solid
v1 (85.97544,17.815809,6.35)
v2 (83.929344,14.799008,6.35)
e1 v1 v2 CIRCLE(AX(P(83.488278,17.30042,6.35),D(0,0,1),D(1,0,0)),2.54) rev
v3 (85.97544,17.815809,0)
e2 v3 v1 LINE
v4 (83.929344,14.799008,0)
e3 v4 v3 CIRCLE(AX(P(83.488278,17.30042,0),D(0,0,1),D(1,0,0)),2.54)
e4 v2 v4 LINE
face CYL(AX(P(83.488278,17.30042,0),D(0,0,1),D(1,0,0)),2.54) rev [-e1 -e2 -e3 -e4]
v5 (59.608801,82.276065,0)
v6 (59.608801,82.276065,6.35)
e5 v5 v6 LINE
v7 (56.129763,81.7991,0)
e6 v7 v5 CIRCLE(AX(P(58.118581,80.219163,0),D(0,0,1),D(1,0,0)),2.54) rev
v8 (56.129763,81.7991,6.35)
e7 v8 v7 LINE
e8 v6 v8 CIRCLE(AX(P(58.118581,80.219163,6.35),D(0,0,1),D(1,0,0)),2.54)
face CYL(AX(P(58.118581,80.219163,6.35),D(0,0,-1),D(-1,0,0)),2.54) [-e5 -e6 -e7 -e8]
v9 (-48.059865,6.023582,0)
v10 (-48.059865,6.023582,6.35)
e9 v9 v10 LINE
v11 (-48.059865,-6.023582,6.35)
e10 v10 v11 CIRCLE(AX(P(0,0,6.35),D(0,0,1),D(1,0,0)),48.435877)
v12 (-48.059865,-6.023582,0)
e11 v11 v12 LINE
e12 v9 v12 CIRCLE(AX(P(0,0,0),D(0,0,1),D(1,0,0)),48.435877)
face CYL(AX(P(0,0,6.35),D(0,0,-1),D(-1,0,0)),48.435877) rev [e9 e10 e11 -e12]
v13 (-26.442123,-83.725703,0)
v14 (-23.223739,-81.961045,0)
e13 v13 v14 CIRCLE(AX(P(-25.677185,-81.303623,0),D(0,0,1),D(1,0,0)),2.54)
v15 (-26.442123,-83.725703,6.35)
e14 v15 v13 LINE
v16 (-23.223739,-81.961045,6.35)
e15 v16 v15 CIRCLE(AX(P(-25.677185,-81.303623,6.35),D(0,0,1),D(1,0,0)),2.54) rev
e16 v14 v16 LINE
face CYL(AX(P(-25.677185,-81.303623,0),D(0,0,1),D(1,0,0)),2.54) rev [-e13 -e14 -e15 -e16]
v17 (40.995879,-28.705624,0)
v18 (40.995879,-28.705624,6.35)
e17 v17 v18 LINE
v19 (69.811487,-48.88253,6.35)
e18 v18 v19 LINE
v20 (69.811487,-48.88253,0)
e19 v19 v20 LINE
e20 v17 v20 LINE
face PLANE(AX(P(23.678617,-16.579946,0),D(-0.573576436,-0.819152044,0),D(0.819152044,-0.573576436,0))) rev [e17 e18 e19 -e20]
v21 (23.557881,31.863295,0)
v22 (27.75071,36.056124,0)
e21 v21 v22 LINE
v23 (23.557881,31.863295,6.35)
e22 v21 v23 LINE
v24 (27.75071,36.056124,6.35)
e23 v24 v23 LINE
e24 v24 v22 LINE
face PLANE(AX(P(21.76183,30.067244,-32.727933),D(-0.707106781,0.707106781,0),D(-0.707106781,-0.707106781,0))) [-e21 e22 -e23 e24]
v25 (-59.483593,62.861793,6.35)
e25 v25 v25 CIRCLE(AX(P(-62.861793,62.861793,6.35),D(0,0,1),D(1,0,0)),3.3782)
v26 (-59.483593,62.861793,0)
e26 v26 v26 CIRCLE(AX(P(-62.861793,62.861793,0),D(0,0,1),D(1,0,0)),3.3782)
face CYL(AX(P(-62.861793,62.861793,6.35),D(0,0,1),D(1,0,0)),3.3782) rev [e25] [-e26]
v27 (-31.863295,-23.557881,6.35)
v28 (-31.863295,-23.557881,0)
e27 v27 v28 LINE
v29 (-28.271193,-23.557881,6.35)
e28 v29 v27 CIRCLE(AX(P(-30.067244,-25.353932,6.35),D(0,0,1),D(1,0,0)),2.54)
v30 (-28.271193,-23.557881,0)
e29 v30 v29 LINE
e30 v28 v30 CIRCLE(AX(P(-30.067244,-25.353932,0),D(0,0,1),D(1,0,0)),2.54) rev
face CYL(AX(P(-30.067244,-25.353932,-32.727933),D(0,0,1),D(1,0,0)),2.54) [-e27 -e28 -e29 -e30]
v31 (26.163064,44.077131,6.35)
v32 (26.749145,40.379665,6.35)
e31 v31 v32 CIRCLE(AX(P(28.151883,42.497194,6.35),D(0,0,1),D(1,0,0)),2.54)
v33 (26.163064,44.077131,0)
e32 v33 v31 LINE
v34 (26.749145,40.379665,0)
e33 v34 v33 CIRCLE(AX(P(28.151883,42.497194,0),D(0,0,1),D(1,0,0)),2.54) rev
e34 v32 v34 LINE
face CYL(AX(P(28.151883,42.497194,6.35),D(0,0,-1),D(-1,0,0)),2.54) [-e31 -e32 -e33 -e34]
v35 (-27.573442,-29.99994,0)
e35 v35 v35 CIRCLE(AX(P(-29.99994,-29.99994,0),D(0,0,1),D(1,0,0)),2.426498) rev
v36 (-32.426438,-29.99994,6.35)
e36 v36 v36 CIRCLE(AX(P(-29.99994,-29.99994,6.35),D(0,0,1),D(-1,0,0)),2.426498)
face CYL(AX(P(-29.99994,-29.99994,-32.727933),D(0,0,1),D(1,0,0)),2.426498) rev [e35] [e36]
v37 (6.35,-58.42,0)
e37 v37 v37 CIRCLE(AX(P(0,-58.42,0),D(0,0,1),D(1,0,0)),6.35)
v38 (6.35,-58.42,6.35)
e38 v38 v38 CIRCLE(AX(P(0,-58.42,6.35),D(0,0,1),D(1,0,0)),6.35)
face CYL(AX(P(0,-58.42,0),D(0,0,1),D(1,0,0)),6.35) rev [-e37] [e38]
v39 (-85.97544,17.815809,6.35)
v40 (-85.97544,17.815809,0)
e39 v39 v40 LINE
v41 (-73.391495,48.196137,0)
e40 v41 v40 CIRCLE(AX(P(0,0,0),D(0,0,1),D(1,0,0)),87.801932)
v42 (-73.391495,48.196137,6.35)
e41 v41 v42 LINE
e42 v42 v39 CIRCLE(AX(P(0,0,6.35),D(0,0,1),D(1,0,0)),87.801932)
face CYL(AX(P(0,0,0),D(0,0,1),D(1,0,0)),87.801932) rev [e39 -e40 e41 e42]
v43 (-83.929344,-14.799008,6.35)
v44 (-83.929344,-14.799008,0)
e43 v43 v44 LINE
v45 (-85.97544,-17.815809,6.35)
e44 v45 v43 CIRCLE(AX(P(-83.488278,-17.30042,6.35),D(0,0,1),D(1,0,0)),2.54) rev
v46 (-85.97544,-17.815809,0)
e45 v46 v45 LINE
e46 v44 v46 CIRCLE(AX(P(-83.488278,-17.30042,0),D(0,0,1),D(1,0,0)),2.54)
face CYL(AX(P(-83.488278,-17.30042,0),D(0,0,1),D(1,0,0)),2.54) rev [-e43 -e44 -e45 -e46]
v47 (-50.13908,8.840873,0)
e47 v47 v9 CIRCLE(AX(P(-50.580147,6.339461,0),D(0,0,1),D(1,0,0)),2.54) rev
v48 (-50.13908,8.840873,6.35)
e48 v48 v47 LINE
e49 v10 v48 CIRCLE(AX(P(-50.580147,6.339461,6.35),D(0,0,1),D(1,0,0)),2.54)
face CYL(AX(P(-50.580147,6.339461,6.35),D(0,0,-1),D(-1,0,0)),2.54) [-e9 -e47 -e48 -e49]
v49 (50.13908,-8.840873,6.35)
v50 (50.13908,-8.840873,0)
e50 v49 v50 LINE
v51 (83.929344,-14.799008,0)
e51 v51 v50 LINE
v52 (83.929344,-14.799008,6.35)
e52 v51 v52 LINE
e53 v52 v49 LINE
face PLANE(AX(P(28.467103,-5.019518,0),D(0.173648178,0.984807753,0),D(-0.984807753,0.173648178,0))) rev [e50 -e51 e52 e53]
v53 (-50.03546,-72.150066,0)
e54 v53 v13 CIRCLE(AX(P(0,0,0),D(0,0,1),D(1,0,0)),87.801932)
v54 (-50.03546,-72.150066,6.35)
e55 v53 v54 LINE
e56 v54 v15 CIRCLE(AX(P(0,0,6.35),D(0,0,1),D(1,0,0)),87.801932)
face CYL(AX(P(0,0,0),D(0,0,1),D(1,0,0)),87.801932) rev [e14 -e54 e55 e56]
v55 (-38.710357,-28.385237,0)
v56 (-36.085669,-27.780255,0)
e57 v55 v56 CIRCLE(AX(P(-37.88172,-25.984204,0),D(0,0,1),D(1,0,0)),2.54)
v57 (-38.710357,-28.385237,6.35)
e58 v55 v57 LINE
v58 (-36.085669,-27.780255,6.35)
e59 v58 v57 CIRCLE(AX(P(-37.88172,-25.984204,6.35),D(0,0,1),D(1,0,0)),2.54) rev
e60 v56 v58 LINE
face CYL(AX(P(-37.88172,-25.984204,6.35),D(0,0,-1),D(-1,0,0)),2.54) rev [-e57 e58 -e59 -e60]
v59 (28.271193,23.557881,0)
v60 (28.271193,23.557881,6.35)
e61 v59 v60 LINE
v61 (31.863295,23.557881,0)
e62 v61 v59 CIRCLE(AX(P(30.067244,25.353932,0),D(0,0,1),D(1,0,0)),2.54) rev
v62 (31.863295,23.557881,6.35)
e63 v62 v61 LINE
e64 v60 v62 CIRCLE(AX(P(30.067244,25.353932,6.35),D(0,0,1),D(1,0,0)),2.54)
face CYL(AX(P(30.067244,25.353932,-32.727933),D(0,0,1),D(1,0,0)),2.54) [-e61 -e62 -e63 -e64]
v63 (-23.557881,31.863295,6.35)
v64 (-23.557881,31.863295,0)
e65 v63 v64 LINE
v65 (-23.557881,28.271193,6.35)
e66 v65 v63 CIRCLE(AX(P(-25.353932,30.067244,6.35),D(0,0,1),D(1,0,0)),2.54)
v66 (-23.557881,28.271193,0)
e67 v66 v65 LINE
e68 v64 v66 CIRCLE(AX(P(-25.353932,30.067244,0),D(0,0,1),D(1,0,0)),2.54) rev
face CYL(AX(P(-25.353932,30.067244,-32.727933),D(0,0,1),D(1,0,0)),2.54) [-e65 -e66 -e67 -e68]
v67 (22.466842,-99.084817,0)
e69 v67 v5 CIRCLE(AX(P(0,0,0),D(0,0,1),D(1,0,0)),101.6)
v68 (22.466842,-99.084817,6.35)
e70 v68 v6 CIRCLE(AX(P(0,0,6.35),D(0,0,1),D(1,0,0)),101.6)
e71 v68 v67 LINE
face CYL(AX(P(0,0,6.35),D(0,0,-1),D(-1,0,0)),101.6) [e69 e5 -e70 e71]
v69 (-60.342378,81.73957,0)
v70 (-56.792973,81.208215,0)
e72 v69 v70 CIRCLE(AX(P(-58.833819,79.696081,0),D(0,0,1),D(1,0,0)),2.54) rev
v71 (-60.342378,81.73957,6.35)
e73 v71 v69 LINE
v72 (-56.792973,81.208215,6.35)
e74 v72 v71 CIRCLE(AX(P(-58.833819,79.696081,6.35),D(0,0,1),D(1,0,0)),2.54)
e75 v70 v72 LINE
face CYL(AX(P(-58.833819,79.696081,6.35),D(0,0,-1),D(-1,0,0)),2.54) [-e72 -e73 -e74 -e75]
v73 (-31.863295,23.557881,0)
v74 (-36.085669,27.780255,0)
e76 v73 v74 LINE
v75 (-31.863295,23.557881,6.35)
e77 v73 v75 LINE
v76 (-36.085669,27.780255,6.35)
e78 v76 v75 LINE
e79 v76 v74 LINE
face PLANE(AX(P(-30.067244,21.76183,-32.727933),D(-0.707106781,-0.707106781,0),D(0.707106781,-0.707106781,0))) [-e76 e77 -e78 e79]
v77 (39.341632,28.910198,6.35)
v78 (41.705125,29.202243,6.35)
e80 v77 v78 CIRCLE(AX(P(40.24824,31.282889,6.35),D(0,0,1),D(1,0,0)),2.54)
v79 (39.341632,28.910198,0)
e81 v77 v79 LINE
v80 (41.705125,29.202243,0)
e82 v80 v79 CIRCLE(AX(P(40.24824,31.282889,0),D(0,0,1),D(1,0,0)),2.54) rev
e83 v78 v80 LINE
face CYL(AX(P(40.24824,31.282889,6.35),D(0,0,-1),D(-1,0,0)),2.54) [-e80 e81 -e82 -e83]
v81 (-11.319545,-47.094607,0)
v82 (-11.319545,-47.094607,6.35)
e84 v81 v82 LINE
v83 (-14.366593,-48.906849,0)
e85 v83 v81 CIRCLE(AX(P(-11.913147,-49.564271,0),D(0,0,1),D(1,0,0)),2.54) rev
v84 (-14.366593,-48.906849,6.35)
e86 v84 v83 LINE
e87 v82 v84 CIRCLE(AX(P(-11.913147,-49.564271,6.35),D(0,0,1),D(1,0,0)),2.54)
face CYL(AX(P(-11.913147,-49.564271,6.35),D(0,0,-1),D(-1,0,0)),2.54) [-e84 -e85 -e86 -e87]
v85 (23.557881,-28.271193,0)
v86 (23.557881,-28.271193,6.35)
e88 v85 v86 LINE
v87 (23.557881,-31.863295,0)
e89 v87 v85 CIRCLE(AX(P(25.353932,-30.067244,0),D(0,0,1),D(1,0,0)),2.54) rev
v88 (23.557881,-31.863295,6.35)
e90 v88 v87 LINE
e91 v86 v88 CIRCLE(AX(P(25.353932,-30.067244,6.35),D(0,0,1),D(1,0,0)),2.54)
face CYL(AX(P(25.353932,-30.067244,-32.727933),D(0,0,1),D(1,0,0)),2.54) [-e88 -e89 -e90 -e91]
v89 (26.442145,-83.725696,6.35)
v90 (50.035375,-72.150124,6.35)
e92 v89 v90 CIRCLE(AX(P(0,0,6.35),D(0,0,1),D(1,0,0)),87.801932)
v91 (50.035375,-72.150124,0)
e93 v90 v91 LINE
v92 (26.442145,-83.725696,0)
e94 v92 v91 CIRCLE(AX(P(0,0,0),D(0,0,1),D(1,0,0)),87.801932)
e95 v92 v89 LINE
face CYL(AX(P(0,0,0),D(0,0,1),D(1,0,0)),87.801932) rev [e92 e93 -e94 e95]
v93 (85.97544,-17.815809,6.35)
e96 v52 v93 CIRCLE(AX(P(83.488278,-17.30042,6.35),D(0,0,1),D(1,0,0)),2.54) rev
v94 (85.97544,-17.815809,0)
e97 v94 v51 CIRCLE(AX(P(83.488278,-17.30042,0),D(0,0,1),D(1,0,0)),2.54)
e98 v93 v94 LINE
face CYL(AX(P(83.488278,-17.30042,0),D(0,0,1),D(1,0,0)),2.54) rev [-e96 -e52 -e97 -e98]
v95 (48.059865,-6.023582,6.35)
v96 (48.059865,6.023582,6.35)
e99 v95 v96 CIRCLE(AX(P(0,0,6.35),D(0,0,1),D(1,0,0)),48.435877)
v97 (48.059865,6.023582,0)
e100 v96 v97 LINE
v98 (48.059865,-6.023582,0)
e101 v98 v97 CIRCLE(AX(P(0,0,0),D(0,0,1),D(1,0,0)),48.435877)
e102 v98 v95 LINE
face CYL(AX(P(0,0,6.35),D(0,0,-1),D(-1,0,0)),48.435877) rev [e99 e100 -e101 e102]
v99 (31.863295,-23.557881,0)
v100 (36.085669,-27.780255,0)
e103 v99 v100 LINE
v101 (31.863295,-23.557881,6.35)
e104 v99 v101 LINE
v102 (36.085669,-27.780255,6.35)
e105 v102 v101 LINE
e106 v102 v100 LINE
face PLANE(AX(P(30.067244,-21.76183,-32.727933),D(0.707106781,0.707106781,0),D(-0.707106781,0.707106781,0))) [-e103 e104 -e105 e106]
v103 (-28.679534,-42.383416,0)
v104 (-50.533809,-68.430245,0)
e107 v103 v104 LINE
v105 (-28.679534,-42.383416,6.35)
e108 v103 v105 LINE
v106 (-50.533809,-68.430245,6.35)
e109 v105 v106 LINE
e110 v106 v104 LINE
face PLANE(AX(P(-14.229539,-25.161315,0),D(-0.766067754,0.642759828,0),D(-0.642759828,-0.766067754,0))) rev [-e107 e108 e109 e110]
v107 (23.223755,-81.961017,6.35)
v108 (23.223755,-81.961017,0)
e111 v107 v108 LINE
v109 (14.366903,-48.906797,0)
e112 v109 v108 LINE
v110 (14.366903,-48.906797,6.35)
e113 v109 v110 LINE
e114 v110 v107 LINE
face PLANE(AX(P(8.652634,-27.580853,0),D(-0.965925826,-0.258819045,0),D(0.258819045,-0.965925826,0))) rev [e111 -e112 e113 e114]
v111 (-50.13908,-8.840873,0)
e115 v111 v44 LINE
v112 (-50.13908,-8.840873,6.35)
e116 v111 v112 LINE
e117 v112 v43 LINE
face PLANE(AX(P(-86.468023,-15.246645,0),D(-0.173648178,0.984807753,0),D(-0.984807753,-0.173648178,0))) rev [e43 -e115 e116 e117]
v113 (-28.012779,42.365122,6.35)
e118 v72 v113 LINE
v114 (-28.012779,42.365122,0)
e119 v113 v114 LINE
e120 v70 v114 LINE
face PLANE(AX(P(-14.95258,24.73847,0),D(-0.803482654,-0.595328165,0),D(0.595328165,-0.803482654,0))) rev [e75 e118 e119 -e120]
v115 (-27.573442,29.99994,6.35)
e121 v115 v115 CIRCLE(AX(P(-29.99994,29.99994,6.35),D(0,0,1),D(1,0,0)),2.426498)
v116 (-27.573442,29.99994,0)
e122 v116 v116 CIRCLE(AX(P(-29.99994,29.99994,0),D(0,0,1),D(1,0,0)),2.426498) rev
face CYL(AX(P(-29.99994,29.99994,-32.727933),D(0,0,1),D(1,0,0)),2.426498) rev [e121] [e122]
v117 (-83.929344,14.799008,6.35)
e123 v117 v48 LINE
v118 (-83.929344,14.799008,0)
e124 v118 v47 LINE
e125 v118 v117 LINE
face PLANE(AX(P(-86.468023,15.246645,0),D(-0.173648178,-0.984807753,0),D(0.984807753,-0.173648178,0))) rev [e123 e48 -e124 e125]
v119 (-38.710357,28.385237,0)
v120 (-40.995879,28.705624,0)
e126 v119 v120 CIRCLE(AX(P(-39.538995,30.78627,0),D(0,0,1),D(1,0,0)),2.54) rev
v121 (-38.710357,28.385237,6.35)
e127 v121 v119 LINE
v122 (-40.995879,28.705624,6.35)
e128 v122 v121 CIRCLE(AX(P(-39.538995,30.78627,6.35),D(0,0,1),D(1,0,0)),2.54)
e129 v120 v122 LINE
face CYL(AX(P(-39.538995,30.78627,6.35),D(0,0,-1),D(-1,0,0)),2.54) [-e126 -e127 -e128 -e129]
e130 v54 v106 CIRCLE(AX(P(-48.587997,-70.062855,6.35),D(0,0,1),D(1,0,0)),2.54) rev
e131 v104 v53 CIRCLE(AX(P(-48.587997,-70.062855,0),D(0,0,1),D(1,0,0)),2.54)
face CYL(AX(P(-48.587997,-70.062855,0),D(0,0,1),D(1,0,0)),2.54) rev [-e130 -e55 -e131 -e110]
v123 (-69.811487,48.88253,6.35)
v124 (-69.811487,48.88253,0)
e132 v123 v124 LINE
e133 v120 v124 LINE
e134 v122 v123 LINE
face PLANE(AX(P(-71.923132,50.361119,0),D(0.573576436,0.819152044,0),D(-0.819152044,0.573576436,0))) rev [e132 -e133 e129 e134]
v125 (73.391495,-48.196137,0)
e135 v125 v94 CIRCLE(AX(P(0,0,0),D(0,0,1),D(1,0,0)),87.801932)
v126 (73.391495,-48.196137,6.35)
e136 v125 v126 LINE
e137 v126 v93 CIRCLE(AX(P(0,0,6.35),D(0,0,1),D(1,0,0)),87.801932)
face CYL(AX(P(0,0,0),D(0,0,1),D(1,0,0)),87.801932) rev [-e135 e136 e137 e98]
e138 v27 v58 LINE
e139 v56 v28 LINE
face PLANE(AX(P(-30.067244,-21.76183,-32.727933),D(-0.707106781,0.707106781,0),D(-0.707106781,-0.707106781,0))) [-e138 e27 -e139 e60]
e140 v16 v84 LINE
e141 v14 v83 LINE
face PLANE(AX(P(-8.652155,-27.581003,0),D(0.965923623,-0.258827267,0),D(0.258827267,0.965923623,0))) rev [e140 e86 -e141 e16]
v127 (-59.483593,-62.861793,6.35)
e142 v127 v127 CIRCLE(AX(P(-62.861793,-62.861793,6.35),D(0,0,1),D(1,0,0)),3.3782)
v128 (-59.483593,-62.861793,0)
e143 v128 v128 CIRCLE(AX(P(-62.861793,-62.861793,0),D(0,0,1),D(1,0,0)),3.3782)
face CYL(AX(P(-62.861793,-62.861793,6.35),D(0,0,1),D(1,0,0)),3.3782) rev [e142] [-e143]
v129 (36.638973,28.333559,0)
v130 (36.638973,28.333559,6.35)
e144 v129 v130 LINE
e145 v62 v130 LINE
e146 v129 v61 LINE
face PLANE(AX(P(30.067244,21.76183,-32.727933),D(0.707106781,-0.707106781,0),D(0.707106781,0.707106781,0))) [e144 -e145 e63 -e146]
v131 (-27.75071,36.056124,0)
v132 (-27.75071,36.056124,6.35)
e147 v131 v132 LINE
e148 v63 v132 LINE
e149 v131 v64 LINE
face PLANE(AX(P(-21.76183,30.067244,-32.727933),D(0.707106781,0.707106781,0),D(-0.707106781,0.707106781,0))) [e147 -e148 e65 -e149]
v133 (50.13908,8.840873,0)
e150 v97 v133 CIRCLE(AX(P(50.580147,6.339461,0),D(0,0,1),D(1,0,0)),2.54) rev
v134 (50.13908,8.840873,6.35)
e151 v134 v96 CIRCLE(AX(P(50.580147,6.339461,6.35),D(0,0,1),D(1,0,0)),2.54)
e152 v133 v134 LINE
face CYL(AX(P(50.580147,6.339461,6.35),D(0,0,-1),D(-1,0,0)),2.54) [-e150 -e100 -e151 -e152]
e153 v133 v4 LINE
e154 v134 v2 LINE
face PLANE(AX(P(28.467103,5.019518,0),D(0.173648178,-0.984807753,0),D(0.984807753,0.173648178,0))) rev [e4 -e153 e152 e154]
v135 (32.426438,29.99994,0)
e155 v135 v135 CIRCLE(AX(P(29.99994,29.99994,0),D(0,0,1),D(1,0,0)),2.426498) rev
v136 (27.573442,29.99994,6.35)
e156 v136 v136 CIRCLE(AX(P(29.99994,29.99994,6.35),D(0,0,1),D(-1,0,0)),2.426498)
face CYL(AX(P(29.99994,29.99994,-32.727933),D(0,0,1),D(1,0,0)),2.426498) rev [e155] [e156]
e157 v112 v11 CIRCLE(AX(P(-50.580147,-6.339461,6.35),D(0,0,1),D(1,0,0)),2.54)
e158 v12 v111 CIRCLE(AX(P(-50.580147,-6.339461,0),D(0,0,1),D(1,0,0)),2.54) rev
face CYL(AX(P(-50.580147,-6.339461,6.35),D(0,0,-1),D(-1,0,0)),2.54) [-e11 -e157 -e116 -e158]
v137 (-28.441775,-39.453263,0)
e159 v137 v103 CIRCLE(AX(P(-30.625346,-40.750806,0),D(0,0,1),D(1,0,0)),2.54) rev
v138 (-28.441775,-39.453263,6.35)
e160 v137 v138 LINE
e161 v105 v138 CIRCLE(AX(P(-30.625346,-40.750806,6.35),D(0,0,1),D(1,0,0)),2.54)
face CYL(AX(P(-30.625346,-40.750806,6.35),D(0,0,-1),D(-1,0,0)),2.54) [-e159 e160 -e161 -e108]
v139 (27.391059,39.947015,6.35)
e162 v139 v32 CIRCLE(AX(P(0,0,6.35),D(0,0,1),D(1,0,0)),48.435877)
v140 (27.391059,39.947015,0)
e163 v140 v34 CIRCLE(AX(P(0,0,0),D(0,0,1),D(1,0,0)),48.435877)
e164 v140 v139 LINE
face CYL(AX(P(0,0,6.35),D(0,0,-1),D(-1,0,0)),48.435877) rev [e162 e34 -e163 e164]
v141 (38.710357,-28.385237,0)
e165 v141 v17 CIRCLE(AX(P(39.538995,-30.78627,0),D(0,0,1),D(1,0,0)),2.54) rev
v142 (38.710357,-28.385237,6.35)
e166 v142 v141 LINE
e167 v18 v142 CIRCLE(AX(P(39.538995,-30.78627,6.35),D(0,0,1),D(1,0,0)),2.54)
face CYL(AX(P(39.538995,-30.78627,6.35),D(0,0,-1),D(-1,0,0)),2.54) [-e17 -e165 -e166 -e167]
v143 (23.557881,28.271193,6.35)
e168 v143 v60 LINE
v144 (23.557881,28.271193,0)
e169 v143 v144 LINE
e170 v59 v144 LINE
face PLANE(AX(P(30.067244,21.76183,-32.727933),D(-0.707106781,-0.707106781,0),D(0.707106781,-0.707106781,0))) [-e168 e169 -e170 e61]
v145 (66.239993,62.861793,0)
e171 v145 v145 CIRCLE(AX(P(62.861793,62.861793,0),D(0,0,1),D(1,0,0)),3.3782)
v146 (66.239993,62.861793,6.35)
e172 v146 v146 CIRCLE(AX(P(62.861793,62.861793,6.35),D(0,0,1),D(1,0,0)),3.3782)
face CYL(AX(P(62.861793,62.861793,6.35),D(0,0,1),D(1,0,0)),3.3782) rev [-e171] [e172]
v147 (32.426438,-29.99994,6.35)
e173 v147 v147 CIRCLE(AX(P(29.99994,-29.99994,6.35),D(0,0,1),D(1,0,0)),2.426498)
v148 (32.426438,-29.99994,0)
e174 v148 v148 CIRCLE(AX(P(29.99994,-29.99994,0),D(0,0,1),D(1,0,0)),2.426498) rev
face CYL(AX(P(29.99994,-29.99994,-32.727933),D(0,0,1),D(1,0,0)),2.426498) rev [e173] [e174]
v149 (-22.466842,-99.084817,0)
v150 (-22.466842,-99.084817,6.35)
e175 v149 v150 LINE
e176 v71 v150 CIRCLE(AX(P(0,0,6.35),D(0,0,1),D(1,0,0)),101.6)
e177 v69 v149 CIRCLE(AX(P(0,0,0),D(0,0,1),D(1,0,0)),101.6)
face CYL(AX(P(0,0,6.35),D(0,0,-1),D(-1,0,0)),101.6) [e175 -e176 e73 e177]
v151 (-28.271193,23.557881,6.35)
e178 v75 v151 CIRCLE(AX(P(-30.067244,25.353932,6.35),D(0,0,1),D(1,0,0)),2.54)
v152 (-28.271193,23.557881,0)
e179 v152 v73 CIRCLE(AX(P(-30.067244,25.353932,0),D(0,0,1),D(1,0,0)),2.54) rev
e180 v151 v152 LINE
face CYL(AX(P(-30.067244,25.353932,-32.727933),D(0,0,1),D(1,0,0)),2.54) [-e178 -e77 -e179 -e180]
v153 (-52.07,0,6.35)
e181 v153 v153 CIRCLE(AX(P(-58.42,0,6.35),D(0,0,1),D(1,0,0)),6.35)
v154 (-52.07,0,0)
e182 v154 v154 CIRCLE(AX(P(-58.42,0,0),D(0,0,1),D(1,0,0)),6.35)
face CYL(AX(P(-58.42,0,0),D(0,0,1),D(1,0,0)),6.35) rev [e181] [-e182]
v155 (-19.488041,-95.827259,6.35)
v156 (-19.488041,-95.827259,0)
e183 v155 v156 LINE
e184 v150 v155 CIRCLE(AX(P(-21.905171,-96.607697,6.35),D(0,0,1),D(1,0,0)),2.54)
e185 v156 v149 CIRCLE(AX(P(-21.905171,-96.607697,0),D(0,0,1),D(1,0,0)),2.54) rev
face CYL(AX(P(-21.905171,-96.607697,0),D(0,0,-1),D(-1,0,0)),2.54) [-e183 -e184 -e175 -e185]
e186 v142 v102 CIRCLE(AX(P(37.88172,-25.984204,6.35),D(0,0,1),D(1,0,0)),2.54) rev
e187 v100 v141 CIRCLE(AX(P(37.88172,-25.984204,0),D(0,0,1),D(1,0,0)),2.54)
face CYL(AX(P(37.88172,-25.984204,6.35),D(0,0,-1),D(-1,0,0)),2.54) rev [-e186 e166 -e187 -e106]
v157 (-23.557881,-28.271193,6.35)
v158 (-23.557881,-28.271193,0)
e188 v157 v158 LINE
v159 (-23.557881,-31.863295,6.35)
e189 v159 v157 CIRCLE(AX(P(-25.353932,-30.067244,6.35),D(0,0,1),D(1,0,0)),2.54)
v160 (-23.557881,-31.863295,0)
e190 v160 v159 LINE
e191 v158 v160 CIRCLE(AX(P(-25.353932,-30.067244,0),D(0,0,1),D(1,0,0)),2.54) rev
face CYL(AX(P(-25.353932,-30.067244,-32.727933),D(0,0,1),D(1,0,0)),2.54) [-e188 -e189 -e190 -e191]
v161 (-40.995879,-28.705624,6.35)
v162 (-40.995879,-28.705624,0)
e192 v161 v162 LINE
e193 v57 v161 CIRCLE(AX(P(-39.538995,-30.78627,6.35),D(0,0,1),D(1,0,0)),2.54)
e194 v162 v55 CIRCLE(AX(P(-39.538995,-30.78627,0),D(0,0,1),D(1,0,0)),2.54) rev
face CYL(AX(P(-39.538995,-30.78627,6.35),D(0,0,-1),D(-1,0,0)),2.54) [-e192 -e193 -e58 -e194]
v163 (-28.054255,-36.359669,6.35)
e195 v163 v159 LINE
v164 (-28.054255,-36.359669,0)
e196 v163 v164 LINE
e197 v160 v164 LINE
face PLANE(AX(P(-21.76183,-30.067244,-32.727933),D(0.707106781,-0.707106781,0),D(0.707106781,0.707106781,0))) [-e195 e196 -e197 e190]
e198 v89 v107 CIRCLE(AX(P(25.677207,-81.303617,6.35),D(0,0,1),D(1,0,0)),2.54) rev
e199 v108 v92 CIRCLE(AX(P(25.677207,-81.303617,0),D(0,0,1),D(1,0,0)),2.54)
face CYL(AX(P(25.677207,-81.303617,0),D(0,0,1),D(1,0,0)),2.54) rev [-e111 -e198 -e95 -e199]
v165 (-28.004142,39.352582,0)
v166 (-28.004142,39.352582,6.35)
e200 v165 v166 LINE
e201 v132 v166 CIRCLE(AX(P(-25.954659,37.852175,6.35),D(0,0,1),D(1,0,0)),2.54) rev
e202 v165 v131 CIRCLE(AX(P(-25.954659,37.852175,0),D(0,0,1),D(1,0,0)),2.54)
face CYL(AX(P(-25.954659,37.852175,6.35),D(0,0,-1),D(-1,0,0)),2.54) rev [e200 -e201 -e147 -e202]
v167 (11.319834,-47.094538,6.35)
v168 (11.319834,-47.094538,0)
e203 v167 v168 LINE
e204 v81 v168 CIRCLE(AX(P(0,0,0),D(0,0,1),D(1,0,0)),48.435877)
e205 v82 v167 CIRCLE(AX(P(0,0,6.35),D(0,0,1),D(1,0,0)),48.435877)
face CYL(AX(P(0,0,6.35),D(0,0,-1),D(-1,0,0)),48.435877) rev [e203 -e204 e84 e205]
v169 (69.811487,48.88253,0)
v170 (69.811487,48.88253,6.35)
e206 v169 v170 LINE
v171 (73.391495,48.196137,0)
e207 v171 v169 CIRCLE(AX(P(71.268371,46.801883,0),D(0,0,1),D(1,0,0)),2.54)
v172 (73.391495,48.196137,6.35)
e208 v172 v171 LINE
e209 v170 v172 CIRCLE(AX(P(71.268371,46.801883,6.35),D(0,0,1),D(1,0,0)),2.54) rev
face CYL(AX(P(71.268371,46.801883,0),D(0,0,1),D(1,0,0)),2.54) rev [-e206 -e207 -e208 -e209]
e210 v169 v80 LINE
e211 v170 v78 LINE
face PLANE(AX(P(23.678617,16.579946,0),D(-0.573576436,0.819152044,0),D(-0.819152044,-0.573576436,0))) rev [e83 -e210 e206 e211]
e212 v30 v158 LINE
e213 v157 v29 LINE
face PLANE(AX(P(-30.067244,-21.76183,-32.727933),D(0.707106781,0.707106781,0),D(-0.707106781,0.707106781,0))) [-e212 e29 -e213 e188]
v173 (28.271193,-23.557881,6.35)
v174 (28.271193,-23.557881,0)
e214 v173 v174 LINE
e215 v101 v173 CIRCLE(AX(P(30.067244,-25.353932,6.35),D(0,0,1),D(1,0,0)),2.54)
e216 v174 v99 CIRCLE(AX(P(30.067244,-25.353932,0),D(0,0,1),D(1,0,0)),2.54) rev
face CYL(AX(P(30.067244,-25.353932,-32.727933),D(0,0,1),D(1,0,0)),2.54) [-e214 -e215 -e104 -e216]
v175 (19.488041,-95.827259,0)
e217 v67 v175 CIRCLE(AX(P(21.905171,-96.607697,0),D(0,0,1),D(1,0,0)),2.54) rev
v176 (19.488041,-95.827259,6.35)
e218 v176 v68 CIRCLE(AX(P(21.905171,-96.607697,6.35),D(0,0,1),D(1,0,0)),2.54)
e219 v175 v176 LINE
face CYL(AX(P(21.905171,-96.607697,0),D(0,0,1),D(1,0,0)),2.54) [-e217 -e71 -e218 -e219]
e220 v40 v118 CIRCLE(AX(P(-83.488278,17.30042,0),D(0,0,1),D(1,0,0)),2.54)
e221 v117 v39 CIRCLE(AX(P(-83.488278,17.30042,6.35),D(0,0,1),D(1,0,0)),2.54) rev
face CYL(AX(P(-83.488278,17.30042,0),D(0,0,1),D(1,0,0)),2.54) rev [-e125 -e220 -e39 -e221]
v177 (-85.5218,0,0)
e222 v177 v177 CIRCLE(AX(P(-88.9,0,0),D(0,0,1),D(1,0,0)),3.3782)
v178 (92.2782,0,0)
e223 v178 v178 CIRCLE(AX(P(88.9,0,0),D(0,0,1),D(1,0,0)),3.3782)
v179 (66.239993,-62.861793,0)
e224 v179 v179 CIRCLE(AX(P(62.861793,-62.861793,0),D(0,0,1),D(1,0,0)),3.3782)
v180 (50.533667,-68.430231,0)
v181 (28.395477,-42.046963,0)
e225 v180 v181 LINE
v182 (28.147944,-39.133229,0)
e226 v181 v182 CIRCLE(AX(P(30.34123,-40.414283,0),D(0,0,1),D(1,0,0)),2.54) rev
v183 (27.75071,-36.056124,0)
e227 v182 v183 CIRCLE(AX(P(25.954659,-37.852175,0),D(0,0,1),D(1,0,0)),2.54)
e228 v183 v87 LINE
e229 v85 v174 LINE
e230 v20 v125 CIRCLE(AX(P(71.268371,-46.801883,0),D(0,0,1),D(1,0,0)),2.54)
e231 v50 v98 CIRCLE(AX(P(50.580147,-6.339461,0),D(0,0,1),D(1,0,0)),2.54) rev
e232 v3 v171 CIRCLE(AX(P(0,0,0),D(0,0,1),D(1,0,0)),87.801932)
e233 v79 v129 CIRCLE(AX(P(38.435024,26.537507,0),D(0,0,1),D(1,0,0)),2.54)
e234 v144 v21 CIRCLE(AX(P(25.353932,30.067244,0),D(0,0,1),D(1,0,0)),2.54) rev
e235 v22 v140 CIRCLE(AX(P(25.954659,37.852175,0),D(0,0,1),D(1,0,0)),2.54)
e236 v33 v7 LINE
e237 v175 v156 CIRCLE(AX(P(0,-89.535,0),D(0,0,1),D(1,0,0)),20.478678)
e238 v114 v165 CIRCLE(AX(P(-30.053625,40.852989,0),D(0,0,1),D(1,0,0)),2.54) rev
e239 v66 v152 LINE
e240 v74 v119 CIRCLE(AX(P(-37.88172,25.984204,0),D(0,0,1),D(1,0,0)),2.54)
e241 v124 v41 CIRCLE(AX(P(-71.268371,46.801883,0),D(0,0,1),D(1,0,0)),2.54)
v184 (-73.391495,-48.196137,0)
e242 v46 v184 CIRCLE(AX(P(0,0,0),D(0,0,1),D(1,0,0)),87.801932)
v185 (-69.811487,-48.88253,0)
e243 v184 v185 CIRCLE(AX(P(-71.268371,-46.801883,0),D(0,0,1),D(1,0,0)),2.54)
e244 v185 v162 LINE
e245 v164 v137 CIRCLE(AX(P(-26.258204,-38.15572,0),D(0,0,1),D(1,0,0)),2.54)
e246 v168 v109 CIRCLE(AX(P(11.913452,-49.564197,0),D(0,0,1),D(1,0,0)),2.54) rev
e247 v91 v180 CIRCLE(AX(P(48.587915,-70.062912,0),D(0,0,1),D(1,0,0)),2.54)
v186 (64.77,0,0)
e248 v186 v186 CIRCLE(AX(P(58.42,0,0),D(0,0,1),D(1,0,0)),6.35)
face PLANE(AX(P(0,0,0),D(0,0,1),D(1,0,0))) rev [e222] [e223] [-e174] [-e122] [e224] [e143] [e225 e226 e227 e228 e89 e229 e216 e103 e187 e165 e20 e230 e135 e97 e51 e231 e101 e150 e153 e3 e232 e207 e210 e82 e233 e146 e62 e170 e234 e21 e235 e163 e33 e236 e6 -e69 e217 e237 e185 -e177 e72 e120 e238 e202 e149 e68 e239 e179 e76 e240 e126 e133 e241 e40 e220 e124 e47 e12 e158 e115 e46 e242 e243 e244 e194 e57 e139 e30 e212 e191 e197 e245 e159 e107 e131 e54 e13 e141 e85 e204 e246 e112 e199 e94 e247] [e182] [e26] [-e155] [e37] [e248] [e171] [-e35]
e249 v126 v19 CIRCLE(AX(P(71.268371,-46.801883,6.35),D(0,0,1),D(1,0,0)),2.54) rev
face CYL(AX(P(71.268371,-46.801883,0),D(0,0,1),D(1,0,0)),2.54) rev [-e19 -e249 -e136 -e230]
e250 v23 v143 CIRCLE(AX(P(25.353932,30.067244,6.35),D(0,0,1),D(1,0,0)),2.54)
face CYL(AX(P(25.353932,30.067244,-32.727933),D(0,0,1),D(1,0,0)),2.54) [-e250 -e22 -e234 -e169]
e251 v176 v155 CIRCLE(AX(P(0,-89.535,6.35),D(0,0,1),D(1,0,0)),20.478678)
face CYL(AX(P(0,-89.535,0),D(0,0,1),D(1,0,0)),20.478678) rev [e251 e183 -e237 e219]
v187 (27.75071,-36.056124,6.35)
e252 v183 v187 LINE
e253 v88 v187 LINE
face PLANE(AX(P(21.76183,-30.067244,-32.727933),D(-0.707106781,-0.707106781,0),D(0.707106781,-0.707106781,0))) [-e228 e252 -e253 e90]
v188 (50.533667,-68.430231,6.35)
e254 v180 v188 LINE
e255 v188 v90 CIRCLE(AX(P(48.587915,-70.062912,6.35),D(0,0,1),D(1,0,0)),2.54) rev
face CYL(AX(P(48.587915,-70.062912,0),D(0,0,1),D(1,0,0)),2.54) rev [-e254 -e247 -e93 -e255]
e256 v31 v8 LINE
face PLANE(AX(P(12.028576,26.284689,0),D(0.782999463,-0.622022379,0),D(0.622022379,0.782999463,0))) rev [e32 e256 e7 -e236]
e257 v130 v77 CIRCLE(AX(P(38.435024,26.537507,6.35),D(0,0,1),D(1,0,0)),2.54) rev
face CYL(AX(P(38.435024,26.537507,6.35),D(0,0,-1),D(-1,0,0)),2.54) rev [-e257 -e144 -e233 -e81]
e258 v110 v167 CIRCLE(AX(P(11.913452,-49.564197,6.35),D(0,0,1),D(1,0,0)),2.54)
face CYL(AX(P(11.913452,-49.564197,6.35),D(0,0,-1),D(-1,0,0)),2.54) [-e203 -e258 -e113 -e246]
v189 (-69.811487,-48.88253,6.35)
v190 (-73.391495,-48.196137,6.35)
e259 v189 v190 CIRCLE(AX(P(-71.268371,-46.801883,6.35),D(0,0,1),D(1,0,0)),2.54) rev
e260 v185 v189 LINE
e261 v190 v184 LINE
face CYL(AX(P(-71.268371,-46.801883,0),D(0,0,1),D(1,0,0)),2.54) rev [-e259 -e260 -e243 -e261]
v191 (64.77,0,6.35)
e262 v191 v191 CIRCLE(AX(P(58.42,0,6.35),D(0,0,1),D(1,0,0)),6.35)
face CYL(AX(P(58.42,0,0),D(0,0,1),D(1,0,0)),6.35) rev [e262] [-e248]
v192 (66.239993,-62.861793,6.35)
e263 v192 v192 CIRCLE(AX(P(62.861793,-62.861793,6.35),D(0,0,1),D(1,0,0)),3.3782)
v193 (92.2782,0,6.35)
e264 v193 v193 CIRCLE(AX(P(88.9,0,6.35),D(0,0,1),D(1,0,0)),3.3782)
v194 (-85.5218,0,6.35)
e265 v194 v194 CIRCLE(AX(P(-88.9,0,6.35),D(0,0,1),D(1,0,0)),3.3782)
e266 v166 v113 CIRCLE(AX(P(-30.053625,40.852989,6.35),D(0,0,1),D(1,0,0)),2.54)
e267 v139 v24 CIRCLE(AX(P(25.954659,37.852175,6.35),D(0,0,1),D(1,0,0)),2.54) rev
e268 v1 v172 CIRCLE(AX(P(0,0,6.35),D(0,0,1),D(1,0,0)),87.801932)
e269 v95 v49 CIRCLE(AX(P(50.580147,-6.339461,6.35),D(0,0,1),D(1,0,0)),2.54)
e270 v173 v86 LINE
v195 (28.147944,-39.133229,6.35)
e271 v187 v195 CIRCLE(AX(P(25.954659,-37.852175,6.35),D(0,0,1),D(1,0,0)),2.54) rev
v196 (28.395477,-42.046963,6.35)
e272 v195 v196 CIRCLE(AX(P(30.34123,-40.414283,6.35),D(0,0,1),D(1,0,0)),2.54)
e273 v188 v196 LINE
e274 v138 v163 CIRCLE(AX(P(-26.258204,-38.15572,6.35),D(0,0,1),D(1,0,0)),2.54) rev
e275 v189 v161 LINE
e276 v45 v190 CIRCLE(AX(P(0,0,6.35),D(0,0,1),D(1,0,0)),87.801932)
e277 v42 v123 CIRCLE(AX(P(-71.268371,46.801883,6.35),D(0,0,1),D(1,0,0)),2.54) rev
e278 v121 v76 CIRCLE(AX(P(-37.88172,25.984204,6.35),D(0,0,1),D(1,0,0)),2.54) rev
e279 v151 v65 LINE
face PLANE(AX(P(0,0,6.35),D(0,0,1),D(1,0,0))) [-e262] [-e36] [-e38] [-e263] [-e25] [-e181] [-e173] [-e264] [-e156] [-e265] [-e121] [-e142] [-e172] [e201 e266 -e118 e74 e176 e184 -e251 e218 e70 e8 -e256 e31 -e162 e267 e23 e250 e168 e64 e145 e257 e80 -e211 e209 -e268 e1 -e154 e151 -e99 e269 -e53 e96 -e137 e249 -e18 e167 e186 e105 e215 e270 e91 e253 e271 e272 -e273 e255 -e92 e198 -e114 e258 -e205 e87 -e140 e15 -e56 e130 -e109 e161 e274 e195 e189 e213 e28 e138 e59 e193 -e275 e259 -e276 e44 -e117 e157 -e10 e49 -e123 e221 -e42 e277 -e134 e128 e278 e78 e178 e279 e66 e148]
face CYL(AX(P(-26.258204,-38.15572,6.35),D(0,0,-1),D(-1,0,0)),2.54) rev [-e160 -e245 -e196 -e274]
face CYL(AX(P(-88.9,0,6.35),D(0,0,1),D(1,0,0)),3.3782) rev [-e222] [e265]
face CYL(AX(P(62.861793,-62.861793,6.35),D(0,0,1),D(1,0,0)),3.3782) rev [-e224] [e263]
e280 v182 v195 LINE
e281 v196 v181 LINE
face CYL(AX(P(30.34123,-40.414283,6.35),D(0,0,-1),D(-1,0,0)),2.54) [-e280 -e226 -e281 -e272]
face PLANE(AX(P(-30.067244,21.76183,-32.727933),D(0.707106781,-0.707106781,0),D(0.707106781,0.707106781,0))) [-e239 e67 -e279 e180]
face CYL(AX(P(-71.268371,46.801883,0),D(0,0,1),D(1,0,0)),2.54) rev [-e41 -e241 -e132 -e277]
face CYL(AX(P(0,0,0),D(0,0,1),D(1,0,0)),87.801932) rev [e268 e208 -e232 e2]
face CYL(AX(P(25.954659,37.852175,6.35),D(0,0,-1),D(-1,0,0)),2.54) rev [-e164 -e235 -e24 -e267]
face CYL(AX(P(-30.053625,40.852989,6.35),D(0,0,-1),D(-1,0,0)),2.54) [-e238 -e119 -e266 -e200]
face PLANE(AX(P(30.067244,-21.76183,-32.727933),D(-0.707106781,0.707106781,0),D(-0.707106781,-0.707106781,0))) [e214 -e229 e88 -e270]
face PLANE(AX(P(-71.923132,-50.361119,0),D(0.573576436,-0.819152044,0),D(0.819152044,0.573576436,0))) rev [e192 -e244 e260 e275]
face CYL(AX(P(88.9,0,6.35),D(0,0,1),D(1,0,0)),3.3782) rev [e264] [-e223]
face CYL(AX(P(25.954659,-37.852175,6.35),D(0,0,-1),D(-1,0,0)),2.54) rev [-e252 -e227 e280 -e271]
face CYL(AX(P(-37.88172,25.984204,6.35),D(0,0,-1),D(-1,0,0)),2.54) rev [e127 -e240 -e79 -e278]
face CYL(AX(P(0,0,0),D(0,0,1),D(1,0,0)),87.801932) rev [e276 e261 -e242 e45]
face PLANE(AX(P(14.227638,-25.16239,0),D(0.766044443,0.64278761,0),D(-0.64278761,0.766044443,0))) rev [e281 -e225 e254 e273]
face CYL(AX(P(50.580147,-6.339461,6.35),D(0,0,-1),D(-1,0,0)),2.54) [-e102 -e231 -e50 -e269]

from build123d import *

# Parameters (mm, degrees)
SKETCH1_R               = 101.6
SKETCH1_R_2             = 48.435876627
EXTRUDE1_DEPTH          = 6.35
F_1_4_CLEARANCE_HOLE1_D = 6.7564
SKETCH11_R              = 20.478678418
CUT_EXTRUDE1_DEPTH      = 144.824345992
SKETCH12_R              = 6.35
CUT_EXTRUDE2_DEPTH      = 144.824345992
SKETCH13_R              = 2.426498152
EXTRUDE2_DEPTH          = 6.35
CUT_EXTRUDE3_DEPTH      = 6.35
FILLET1_R               = 2.54
FILLET2_R               = 2.54
FILLET3_R               = 2.54
FILLET4_R               = 2.54
FILLET5_R               = 2.54
FILLET6_R               = 2.54


with BuildPart() as part:
    # Sketch1 → Extrude1 (new body)
    with BuildSketch(Plane.XY):
        Circle(SKETCH1_R)
        Circle(SKETCH1_R_2, mode=Mode.SUBTRACT)
    extrude(amount=EXTRUDE1_DEPTH)

    # 1/4 Clearance Hole1 (through all)
    with Locations(Plane.XY.offset(6.35)):
        with Locations((62.861792847, -62.861792847), (88.9, 0), (62.861792847, 62.861792847), (-62.861792847, 62.861792847), (-88.9, 0), (-62.861792847, -62.861792847)):
            Hole(F_1_4_CLEARANCE_HOLE1_D / 2)

    # Sketch11 → Cut-Extrude1 (cut, through all)
    with BuildSketch(Plane.XY.offset(6.35)):
        with Locations((0, -89.535)):
            Circle(SKETCH11_R)
    extrude(amount=-CUT_EXTRUDE1_DEPTH, mode=Mode.SUBTRACT)

    # Sketch12 → Cut-Extrude2 (cut, through all)
    with BuildSketch(Plane.XY.offset(6.35)):
        with Locations((0, -58.42)):
            Circle(SKETCH12_R)
        with Locations((-58.42, 0)):
            Circle(SKETCH12_R)
        with Locations((58.42, 0)):
            Circle(SKETCH12_R)
    extrude(amount=-CUT_EXTRUDE2_DEPTH, mode=Mode.SUBTRACT)

    # Sketch13 → Extrude2 (add)
    # profile 1 of 4: a face of its own
    with BuildSketch(Plane.XY.offset(6.35)):
        Polygon((30.067243726, -21.76182967), (44.903973325, -36.598559269), (36.598559269, -44.903973325), (21.76182967, -30.067243726), align=None)
        with Locations((29.99994, -29.99994)):
            Circle(SKETCH13_R, mode=Mode.SUBTRACT)
    # profile 2 of 4: a face of its own
    with BuildSketch(Plane.XY.offset(6.35)):
        Polygon((-30.067243726, -21.76182967), (-44.903973325, -36.598559269), (-36.598559269, -44.903973325), (-21.76182967, -30.067243726), align=None)
        with Locations((-29.99994, -29.99994)):
            Circle(SKETCH13_R, mode=Mode.SUBTRACT)
    # profile 3 of 4: a face of its own
    with BuildSketch(Plane.XY.offset(6.35)):
        Polygon((-30.067243726, 21.76182967), (-21.76182967, 30.067243726), (-36.598559269, 44.903973325), (-44.903973325, 36.598559269), align=None)
        with Locations((-29.99994, 29.99994)):
            Circle(SKETCH13_R, mode=Mode.SUBTRACT)
    # profile 4 of 4: a face of its own
    with BuildSketch(Plane.XY.offset(6.35)):
        Polygon((30.067243726, 21.76182967), (21.76182967, 30.067243726), (36.598559269, 44.903973325), (44.903973325, 36.598559269), align=None)
        with Locations((29.99994, 29.99994)):
            Circle(SKETCH13_R, mode=Mode.SUBTRACT)
    extrude(amount=-EXTRUDE2_DEPTH)

    # Sketch14 → Cut-Extrude3 (cut)
    with BuildSketch(Plane.XY.offset(6.35)):
        with BuildLine():
            Line((12.028575829, 26.284689432), (72.48616559, 102.388479134))
            Line((72.48616559, 102.388479134), (0, 148.475476712))
            Line((0, 148.475476712), (-72.48616559, 102.388479134))
            Line((-72.48616559, 102.388479134), (-14.952580365, 24.738469546))
            ThreePointArc((-14.952580365, 24.738469546), (-1.653828775, 28.858904786), (12.028575829, 26.284689432))
        make_face()
        with BuildLine():
            Line((8.652633897, -27.580853172), (23.900424698, -84.486383146))
            ThreePointArc((23.900424698, -84.486383146), (38.731626443, -78.797464115), (52.295107345, -70.52943347))
            Line((52.295107345, -70.52943347), (14.227637724, -25.162389788))
            ThreePointArc((14.227637724, -25.162389788), (11.503866682, -26.518532886), (8.652633897, -27.580853172))
        make_face()
        with BuildLine():
            Line((-71.923131973, 50.361119179), (-23.678617266, 16.579946304))
            ThreePointArc((-23.678617266, 16.579946304), (-26.705896668, 11.061944595), (-28.467103301, 5.019518375))
            Line((-28.467103301, 5.019518375), (-86.468023222, 15.246645463))
            ThreePointArc((-86.468023222, 15.246645463), (-81.118407758, 33.600344651), (-71.923131973, 50.361119179))
        make_face()
        with BuildLine():
            Line((-8.652154992, -27.581003409), (-23.900424698, -84.486383146))
            ThreePointArc((-23.900424698, -84.486383146), (-38.731626443, -78.797464115), (-52.295107345, -70.52943347))
            Line((-52.295107345, -70.52943347), (-14.229539169, -25.161314554))
            ThreePointArc((-14.229539169, -25.161314554), (-11.504638432, -26.518198083), (-8.652154992, -27.581003409))
        make_face()
        with BuildLine():
            Line((-86.468023222, -15.246645463), (-28.467103301, -5.019518375))
            ThreePointArc((-28.467103301, -5.019518375), (-26.705896668, -11.061944595), (-23.678617266, -16.579946304))
            Line((-23.678617266, -16.579946304), (-71.923131973, -50.361119179))
            ThreePointArc((-71.923131973, -50.361119179), (-81.118407758, -33.600344651), (-86.468023222, -15.246645463))
        make_face()
        with BuildLine():
            Line((23.678617266, -16.579946304), (71.923131973, -50.361119179))
            ThreePointArc((71.923131973, -50.361119179), (81.118407758, -33.600344651), (86.468023222, -15.246645463))
            Line((86.468023222, -15.246645463), (28.467103301, -5.019518375))
            ThreePointArc((28.467103301, -5.019518375), (26.705896668, -11.061944595), (23.678617266, -16.579946304))
        make_face()
        with BuildLine():
            Line((28.467103301, 5.019518375), (86.468023222, 15.246645463))
            ThreePointArc((86.468023222, 15.246645463), (81.118407758, 33.600344651), (71.923131973, 50.361119179))
            Line((71.923131973, 50.361119179), (23.678617266, 16.579946304))
            ThreePointArc((23.678617266, 16.579946304), (26.705896668, 11.061944595), (28.467103301, 5.019518375))
        make_face()
    extrude(amount=-CUT_EXTRUDE3_DEPTH, mode=Mode.SUBTRACT)

    # Fillet1
    fillet1_edges = [part.edges().sort_by_distance(p)[0] for p in [
        (-21.76182967, 30.067243726, 3.175),
        (-30.067243726, 21.76182967, 3.175),
        (21.76182967, 30.067243726, 3.175),
        (30.067243726, 21.76182967, 3.175),
        (-58.28362304, 83.220065401, 3.175),
        (52.295107345, -70.52943347, 3.175),
        (23.900424698, -84.486383146, 3.175),
        (-23.900424698, -84.486383146, 3.175),
        (-52.295107345, -70.52943347, 3.175),
        (47.700026827, -8.41080171, 3.175),
        (86.468023222, -15.246645463, 3.175),
        (71.923131973, -50.361119179, 3.175),
        (-71.923131973, -50.361119179, 3.175),
        (-86.468023222, -15.246645463, 3.175),
        (71.923131973, 50.361119179, 3.175),
        (86.468023222, 15.246645463, 3.175),
        (-86.468023222, 15.246645463, 3.175),
        (-71.923131973, 50.361119179, 3.175),
        (29.843941288, -38.149355343, 3.175),
        (30.067243726, -21.76182967, 3.175),
        (21.76182967, -30.067243726, 3.175),
        (-21.76182967, -30.067243726, 3.175),
        (-30.067243726, -21.76182967, 3.175),
    ]]
    fillet(fillet1_edges, radius=FILLET1_R)

    # Fillet2
    # the kernel refuses this fillet: 2.54 mm, written as the material it adds along each edge
    with BuildSketch(Plane(origin=(-38.149355343, -29.843941288, 6.35), x_dir=(-0.5950738455841501, 0.8036710261678537, 0), z_dir=(0, 0, -1))) as fillet2_piece_1:
        with BuildLine():
            CenterArc((2.942696634, 2.511919748), FILLET2_R, 171.517896562, 89.954594463)
            Line((0.430479195, 2.88657097), (0, 0))
            ThreePointArc((0, 0), (1.283027329, -0.016996162), (2.566054658, 0))
        make_face()
    extrude(amount=6.35)
    # the kernel refuses this fillet: 2.54 mm, written as the material it takes off along each edge
    with BuildSketch(Plane(origin=(39.676347356, 27.781677508, 12.541699401), x_dir=(-0.5938127759220886, 0.804603248285578, 0), z_dir=(0, 0, -1))) as fillet2_2_piece_1:
        with BuildLine():
            CenterArc((2.477488567, 2.539211105), FILLET2_R, 181.428043786, 87.143912429)
            Line((-0.061722539, 2.475910532), (0, 0))
            ThreePointArc((0, 0), (1.207093997, 0.015043624), (2.414187993, 0))
        make_face()
    extrude(amount=18.733398802, mode=Mode.SUBTRACT)

    # Fillet3
    # the kernel refuses this fillet: 2.54 mm, written as the material it adds along each edge
    with BuildSketch(Plane(origin=(38.149355343, -29.843941288, 6.35), x_dir=(-0.7071067811865487, 0.7071067811865462, 0), z_dir=(0, 0, -1))) as fillet3_piece_1:
        with BuildLine():
            CenterArc((2.918493499, 2.54), FILLET3_R, 180.045405537, 89.954594463)
            ThreePointArc((0.378494296, 2.537987111), (0.172436891, 1.271500497), (0, 0))
            Line((0, 0), (2.918493499, 0))
        make_face()
    extrude(amount=6.35)
    with BuildSketch(Plane(origin=(-29.843941288, 38.149355343, 6.35), x_dir=(0.8065806519344794, 0.5911240579818674, 0), z_dir=(0, 0, -1))) as fillet3_piece_2:
        with BuildLine():
            CenterArc((2.961349729, 2.538748086), FILLET3_R, 171.236815401, 100.562162322)
            Line((0.451000474, 2.925719166), (0, 0))
            ThreePointArc((0, 0), (1.52054388, -0.023873044), (3.041087761, 0))
        make_face()
    extrude(amount=6.35)
    # the kernel refuses this fillet: 2.54 mm, written as the material it takes off along each edge
    with BuildSketch(Plane(origin=(26.907852458, -40.274081253, 12.135832501), x_dir=(0.6427876096865405, -0.766044443118977, 0), z_dir=(0, 0, -1))) as fillet3_2_piece_1:
        with BuildLine():
            CenterArc((2.314333001, -2.54), FILLET3_R, 90, 70.288335328)
            Line((-0.076827818, -1.683291217), (-0.3159439, -1.597620338))
            ThreePointArc((-0.3159439, -1.597620338), (-0.19275198, -0.605010424), (-0.252489157, -0.027662711))
            Line((-0.252489157, -0.027662711), (0, 0.254))
            Line((0, 0.254), (2.314333001, 0.254))
            Line((2.314333001, 0.254), (2.314333001, 0))
        make_face()
    extrude(amount=17.921665003, mode=Mode.SUBTRACT)
    with BuildSketch(Plane(origin=(13.709958303, -46.455044807, 12.695601727), x_dir=(-0.9660206148643551, -0.2584650298533505, 0), z_dir=(0, 0, -1))) as fillet3_2_piece_2:
        with BuildLine():
            CenterArc((2.539069601, -2.539171394), FILLET3_R, 91.463547204, 88.51545472)
            Line((-0.000930229, -2.53824052), (0, 0))
            ThreePointArc((0, 0), (1.237097807, -0.015800898), (2.474195614, 0))
        make_face()
    extrude(amount=19.041203453, mode=Mode.SUBTRACT)

    # Fillet4
    # the kernel refuses this fillet: 2.54 mm, written as the material it adds along each edge
    with BuildSketch(Plane(origin=(-38.149355343, 29.843941288, 6.35), x_dir=(0.7071067811865469, -0.707106781186548, 0), z_dir=(0, 0, -1))) as fillet4_piece_1:
        with BuildLine():
            CenterArc((2.918493499, 2.54), FILLET4_R, 180.045405537, 89.954594463)
            ThreePointArc((0.378494296, 2.537987111), (0.172436891, 1.271500497), (0, 0))
            Line((0, 0), (2.918493499, 0))
        make_face()
    extrude(amount=6.35)
    # the kernel refuses this fillet: 2.54 mm, written as the material it takes off along each edge
    with BuildSketch(Plane(origin=(-47.700026827, -8.41080171, 12.541699401), x_dir=(-0.14905137241773606, 0.9888294536371727, 0), z_dir=(0, 0, -1)), Plane(origin=(47.700026827, 8.41080171, 12.541699401), x_dir=(0.14905137241773964, -0.9888294536371721, 0), z_dir=(0, 0, -1))) as fillet4_2_piece_1:
        with BuildLine():
            CenterArc((2.477488567, -2.539211105), FILLET4_R, 91.428043786, 87.143912429)
            Line((-0.061722539, -2.475910532), (0, 0))
            ThreePointArc((0, 0), (1.207093997, -0.015043624), (2.414187993, 0))
        make_face()
    extrude(amount=18.733398802, mode=Mode.SUBTRACT)
    with BuildSketch(Plane(origin=(17.560484701, -100.070921736, 18.861181089), x_dir=(0.9803945166851711, 0.19704464380857967, 0), z_dir=(0, 0, -1))) as fillet4_2_piece_2:
        with BuildLine():
            CenterArc((4.94191653, -2.53922956), FILLET4_R, 88.588759135, 120.669556016)
            ThreePointArc((2.725956812, -3.780649122), (1.470887681, -1.812518868), (0, 0))
            ThreePointArc((0, 0), (2.502236218, 0.030817598), (5.004472435, 0))
        make_face()
    extrude(amount=31.372362177, mode=Mode.SUBTRACT)
    with BuildSketch(Plane(origin=(24.390914285, 41.846355218, 13.472532368), x_dir=(0.8491621946398489, -0.5281321493664586, 0), z_dir=(0, 0, -1))) as fillet4_2_piece_3:
        with BuildLine():
            CenterArc((2.849943346, -2.538956025), FILLET4_R, 91.642784634, 94.941847216)
            Line((0.326698306, -2.830219601), (0, 0))
            ThreePointArc((0, 0), (1.388563221, -0.019907807), (2.777126442, 0))
        make_face()
    extrude(amount=20.595064737, mode=Mode.SUBTRACT)
    with BuildSketch(Plane(origin=(-26.609815652, 40.471617902, 12.24155284), x_dir=(-0.7798923981338155, -0.6259136101197083, 0), z_dir=(0, 0, -1))) as fillet4_2_piece_4:
        with BuildLine():
            CenterArc((2.447095276, 2.45295493), FILLET4_R, 182.213245662, 72.743528001)
            Line((-0.091009923, 2.354863132), (-0.344820443, 2.345053953))
            Line((-0.344820443, 2.345053953), (-0.25381052, -0.00980918))
            Line((-0.25381052, -0.00980918), (0.024012194, -0.252862442))
            ThreePointArc((0.024012194, -0.252862442), (0.956736499, -0.173423977), (1.721918984, -0.245295493))
            Line((1.721918984, -0.245295493), (1.787844102, 0))
        make_face()
    extrude(amount=18.133105679, mode=Mode.SUBTRACT)
    with BuildSketch(Plane(origin=(39.676347356, -27.781677508, 10.377126904), x_dir=(-0.8480711193304941, -0.5298824176716216, 0), z_dir=(0, 0, -1))) as fillet4_2_piece_5:
        with BuildLine():
            CenterArc((1.708565245, -2.475327247), FILLET4_R, 102.957083854, 54.040426754)
            Line((-0.62947396, -1.482768596), (0, 0))
            ThreePointArc((0, 0), (0.569521748, -0.064672753), (1.139043497, 0))
        make_face()
    extrude(amount=14.404253807, mode=Mode.SUBTRACT)
    with BuildSketch(Plane(origin=(57.623035007, 83.678825497, 12.428140181), x_dir=(-0.6220223792607296, -0.782999463409025, 0), z_dir=(0, 0, -1))) as fillet4_2_piece_6:
        with BuildLine():
            CenterArc((2.400673018, -2.54), FILLET4_R, 90, 87.459264669)
            ThreePointArc((-0.136830054, -2.42740265), (-0.07567616, -1.213292023), (0, 0))
            Line((0, 0), (2.400673018, 0))
        make_face()
    extrude(amount=18.506280363, mode=Mode.SUBTRACT)

    # Fillet5
    fillet5_edges = [part.edges().sort_by_distance(p)[0] for p in [
        (-26.909050546, -40.273280762, 3.175),
        (-13.709636762, -46.4551397, 3.175),
        (-39.676347356, 27.781677508, 3.175),
        (-47.700026827, 8.41080171, 3.175),
        (-17.560484701, -100.070921736, 3.175),
    ]]
    fillet(fillet5_edges, radius=FILLET5_R)

    # Fillet6
    fillet6_edges = [part.edges().sort_by_distance(p)[0] for p in [
        (-29.843941288, -38.149355343, 3.175),
        (-39.676347356, -27.781677508, 3.175),
        (38.149355343, 29.843941288, 3.175),
        (29.843941288, 38.149355343, 3.175),
    ]]
    fillet(fillet6_edges, radius=FILLET6_R)


solid = part.part
